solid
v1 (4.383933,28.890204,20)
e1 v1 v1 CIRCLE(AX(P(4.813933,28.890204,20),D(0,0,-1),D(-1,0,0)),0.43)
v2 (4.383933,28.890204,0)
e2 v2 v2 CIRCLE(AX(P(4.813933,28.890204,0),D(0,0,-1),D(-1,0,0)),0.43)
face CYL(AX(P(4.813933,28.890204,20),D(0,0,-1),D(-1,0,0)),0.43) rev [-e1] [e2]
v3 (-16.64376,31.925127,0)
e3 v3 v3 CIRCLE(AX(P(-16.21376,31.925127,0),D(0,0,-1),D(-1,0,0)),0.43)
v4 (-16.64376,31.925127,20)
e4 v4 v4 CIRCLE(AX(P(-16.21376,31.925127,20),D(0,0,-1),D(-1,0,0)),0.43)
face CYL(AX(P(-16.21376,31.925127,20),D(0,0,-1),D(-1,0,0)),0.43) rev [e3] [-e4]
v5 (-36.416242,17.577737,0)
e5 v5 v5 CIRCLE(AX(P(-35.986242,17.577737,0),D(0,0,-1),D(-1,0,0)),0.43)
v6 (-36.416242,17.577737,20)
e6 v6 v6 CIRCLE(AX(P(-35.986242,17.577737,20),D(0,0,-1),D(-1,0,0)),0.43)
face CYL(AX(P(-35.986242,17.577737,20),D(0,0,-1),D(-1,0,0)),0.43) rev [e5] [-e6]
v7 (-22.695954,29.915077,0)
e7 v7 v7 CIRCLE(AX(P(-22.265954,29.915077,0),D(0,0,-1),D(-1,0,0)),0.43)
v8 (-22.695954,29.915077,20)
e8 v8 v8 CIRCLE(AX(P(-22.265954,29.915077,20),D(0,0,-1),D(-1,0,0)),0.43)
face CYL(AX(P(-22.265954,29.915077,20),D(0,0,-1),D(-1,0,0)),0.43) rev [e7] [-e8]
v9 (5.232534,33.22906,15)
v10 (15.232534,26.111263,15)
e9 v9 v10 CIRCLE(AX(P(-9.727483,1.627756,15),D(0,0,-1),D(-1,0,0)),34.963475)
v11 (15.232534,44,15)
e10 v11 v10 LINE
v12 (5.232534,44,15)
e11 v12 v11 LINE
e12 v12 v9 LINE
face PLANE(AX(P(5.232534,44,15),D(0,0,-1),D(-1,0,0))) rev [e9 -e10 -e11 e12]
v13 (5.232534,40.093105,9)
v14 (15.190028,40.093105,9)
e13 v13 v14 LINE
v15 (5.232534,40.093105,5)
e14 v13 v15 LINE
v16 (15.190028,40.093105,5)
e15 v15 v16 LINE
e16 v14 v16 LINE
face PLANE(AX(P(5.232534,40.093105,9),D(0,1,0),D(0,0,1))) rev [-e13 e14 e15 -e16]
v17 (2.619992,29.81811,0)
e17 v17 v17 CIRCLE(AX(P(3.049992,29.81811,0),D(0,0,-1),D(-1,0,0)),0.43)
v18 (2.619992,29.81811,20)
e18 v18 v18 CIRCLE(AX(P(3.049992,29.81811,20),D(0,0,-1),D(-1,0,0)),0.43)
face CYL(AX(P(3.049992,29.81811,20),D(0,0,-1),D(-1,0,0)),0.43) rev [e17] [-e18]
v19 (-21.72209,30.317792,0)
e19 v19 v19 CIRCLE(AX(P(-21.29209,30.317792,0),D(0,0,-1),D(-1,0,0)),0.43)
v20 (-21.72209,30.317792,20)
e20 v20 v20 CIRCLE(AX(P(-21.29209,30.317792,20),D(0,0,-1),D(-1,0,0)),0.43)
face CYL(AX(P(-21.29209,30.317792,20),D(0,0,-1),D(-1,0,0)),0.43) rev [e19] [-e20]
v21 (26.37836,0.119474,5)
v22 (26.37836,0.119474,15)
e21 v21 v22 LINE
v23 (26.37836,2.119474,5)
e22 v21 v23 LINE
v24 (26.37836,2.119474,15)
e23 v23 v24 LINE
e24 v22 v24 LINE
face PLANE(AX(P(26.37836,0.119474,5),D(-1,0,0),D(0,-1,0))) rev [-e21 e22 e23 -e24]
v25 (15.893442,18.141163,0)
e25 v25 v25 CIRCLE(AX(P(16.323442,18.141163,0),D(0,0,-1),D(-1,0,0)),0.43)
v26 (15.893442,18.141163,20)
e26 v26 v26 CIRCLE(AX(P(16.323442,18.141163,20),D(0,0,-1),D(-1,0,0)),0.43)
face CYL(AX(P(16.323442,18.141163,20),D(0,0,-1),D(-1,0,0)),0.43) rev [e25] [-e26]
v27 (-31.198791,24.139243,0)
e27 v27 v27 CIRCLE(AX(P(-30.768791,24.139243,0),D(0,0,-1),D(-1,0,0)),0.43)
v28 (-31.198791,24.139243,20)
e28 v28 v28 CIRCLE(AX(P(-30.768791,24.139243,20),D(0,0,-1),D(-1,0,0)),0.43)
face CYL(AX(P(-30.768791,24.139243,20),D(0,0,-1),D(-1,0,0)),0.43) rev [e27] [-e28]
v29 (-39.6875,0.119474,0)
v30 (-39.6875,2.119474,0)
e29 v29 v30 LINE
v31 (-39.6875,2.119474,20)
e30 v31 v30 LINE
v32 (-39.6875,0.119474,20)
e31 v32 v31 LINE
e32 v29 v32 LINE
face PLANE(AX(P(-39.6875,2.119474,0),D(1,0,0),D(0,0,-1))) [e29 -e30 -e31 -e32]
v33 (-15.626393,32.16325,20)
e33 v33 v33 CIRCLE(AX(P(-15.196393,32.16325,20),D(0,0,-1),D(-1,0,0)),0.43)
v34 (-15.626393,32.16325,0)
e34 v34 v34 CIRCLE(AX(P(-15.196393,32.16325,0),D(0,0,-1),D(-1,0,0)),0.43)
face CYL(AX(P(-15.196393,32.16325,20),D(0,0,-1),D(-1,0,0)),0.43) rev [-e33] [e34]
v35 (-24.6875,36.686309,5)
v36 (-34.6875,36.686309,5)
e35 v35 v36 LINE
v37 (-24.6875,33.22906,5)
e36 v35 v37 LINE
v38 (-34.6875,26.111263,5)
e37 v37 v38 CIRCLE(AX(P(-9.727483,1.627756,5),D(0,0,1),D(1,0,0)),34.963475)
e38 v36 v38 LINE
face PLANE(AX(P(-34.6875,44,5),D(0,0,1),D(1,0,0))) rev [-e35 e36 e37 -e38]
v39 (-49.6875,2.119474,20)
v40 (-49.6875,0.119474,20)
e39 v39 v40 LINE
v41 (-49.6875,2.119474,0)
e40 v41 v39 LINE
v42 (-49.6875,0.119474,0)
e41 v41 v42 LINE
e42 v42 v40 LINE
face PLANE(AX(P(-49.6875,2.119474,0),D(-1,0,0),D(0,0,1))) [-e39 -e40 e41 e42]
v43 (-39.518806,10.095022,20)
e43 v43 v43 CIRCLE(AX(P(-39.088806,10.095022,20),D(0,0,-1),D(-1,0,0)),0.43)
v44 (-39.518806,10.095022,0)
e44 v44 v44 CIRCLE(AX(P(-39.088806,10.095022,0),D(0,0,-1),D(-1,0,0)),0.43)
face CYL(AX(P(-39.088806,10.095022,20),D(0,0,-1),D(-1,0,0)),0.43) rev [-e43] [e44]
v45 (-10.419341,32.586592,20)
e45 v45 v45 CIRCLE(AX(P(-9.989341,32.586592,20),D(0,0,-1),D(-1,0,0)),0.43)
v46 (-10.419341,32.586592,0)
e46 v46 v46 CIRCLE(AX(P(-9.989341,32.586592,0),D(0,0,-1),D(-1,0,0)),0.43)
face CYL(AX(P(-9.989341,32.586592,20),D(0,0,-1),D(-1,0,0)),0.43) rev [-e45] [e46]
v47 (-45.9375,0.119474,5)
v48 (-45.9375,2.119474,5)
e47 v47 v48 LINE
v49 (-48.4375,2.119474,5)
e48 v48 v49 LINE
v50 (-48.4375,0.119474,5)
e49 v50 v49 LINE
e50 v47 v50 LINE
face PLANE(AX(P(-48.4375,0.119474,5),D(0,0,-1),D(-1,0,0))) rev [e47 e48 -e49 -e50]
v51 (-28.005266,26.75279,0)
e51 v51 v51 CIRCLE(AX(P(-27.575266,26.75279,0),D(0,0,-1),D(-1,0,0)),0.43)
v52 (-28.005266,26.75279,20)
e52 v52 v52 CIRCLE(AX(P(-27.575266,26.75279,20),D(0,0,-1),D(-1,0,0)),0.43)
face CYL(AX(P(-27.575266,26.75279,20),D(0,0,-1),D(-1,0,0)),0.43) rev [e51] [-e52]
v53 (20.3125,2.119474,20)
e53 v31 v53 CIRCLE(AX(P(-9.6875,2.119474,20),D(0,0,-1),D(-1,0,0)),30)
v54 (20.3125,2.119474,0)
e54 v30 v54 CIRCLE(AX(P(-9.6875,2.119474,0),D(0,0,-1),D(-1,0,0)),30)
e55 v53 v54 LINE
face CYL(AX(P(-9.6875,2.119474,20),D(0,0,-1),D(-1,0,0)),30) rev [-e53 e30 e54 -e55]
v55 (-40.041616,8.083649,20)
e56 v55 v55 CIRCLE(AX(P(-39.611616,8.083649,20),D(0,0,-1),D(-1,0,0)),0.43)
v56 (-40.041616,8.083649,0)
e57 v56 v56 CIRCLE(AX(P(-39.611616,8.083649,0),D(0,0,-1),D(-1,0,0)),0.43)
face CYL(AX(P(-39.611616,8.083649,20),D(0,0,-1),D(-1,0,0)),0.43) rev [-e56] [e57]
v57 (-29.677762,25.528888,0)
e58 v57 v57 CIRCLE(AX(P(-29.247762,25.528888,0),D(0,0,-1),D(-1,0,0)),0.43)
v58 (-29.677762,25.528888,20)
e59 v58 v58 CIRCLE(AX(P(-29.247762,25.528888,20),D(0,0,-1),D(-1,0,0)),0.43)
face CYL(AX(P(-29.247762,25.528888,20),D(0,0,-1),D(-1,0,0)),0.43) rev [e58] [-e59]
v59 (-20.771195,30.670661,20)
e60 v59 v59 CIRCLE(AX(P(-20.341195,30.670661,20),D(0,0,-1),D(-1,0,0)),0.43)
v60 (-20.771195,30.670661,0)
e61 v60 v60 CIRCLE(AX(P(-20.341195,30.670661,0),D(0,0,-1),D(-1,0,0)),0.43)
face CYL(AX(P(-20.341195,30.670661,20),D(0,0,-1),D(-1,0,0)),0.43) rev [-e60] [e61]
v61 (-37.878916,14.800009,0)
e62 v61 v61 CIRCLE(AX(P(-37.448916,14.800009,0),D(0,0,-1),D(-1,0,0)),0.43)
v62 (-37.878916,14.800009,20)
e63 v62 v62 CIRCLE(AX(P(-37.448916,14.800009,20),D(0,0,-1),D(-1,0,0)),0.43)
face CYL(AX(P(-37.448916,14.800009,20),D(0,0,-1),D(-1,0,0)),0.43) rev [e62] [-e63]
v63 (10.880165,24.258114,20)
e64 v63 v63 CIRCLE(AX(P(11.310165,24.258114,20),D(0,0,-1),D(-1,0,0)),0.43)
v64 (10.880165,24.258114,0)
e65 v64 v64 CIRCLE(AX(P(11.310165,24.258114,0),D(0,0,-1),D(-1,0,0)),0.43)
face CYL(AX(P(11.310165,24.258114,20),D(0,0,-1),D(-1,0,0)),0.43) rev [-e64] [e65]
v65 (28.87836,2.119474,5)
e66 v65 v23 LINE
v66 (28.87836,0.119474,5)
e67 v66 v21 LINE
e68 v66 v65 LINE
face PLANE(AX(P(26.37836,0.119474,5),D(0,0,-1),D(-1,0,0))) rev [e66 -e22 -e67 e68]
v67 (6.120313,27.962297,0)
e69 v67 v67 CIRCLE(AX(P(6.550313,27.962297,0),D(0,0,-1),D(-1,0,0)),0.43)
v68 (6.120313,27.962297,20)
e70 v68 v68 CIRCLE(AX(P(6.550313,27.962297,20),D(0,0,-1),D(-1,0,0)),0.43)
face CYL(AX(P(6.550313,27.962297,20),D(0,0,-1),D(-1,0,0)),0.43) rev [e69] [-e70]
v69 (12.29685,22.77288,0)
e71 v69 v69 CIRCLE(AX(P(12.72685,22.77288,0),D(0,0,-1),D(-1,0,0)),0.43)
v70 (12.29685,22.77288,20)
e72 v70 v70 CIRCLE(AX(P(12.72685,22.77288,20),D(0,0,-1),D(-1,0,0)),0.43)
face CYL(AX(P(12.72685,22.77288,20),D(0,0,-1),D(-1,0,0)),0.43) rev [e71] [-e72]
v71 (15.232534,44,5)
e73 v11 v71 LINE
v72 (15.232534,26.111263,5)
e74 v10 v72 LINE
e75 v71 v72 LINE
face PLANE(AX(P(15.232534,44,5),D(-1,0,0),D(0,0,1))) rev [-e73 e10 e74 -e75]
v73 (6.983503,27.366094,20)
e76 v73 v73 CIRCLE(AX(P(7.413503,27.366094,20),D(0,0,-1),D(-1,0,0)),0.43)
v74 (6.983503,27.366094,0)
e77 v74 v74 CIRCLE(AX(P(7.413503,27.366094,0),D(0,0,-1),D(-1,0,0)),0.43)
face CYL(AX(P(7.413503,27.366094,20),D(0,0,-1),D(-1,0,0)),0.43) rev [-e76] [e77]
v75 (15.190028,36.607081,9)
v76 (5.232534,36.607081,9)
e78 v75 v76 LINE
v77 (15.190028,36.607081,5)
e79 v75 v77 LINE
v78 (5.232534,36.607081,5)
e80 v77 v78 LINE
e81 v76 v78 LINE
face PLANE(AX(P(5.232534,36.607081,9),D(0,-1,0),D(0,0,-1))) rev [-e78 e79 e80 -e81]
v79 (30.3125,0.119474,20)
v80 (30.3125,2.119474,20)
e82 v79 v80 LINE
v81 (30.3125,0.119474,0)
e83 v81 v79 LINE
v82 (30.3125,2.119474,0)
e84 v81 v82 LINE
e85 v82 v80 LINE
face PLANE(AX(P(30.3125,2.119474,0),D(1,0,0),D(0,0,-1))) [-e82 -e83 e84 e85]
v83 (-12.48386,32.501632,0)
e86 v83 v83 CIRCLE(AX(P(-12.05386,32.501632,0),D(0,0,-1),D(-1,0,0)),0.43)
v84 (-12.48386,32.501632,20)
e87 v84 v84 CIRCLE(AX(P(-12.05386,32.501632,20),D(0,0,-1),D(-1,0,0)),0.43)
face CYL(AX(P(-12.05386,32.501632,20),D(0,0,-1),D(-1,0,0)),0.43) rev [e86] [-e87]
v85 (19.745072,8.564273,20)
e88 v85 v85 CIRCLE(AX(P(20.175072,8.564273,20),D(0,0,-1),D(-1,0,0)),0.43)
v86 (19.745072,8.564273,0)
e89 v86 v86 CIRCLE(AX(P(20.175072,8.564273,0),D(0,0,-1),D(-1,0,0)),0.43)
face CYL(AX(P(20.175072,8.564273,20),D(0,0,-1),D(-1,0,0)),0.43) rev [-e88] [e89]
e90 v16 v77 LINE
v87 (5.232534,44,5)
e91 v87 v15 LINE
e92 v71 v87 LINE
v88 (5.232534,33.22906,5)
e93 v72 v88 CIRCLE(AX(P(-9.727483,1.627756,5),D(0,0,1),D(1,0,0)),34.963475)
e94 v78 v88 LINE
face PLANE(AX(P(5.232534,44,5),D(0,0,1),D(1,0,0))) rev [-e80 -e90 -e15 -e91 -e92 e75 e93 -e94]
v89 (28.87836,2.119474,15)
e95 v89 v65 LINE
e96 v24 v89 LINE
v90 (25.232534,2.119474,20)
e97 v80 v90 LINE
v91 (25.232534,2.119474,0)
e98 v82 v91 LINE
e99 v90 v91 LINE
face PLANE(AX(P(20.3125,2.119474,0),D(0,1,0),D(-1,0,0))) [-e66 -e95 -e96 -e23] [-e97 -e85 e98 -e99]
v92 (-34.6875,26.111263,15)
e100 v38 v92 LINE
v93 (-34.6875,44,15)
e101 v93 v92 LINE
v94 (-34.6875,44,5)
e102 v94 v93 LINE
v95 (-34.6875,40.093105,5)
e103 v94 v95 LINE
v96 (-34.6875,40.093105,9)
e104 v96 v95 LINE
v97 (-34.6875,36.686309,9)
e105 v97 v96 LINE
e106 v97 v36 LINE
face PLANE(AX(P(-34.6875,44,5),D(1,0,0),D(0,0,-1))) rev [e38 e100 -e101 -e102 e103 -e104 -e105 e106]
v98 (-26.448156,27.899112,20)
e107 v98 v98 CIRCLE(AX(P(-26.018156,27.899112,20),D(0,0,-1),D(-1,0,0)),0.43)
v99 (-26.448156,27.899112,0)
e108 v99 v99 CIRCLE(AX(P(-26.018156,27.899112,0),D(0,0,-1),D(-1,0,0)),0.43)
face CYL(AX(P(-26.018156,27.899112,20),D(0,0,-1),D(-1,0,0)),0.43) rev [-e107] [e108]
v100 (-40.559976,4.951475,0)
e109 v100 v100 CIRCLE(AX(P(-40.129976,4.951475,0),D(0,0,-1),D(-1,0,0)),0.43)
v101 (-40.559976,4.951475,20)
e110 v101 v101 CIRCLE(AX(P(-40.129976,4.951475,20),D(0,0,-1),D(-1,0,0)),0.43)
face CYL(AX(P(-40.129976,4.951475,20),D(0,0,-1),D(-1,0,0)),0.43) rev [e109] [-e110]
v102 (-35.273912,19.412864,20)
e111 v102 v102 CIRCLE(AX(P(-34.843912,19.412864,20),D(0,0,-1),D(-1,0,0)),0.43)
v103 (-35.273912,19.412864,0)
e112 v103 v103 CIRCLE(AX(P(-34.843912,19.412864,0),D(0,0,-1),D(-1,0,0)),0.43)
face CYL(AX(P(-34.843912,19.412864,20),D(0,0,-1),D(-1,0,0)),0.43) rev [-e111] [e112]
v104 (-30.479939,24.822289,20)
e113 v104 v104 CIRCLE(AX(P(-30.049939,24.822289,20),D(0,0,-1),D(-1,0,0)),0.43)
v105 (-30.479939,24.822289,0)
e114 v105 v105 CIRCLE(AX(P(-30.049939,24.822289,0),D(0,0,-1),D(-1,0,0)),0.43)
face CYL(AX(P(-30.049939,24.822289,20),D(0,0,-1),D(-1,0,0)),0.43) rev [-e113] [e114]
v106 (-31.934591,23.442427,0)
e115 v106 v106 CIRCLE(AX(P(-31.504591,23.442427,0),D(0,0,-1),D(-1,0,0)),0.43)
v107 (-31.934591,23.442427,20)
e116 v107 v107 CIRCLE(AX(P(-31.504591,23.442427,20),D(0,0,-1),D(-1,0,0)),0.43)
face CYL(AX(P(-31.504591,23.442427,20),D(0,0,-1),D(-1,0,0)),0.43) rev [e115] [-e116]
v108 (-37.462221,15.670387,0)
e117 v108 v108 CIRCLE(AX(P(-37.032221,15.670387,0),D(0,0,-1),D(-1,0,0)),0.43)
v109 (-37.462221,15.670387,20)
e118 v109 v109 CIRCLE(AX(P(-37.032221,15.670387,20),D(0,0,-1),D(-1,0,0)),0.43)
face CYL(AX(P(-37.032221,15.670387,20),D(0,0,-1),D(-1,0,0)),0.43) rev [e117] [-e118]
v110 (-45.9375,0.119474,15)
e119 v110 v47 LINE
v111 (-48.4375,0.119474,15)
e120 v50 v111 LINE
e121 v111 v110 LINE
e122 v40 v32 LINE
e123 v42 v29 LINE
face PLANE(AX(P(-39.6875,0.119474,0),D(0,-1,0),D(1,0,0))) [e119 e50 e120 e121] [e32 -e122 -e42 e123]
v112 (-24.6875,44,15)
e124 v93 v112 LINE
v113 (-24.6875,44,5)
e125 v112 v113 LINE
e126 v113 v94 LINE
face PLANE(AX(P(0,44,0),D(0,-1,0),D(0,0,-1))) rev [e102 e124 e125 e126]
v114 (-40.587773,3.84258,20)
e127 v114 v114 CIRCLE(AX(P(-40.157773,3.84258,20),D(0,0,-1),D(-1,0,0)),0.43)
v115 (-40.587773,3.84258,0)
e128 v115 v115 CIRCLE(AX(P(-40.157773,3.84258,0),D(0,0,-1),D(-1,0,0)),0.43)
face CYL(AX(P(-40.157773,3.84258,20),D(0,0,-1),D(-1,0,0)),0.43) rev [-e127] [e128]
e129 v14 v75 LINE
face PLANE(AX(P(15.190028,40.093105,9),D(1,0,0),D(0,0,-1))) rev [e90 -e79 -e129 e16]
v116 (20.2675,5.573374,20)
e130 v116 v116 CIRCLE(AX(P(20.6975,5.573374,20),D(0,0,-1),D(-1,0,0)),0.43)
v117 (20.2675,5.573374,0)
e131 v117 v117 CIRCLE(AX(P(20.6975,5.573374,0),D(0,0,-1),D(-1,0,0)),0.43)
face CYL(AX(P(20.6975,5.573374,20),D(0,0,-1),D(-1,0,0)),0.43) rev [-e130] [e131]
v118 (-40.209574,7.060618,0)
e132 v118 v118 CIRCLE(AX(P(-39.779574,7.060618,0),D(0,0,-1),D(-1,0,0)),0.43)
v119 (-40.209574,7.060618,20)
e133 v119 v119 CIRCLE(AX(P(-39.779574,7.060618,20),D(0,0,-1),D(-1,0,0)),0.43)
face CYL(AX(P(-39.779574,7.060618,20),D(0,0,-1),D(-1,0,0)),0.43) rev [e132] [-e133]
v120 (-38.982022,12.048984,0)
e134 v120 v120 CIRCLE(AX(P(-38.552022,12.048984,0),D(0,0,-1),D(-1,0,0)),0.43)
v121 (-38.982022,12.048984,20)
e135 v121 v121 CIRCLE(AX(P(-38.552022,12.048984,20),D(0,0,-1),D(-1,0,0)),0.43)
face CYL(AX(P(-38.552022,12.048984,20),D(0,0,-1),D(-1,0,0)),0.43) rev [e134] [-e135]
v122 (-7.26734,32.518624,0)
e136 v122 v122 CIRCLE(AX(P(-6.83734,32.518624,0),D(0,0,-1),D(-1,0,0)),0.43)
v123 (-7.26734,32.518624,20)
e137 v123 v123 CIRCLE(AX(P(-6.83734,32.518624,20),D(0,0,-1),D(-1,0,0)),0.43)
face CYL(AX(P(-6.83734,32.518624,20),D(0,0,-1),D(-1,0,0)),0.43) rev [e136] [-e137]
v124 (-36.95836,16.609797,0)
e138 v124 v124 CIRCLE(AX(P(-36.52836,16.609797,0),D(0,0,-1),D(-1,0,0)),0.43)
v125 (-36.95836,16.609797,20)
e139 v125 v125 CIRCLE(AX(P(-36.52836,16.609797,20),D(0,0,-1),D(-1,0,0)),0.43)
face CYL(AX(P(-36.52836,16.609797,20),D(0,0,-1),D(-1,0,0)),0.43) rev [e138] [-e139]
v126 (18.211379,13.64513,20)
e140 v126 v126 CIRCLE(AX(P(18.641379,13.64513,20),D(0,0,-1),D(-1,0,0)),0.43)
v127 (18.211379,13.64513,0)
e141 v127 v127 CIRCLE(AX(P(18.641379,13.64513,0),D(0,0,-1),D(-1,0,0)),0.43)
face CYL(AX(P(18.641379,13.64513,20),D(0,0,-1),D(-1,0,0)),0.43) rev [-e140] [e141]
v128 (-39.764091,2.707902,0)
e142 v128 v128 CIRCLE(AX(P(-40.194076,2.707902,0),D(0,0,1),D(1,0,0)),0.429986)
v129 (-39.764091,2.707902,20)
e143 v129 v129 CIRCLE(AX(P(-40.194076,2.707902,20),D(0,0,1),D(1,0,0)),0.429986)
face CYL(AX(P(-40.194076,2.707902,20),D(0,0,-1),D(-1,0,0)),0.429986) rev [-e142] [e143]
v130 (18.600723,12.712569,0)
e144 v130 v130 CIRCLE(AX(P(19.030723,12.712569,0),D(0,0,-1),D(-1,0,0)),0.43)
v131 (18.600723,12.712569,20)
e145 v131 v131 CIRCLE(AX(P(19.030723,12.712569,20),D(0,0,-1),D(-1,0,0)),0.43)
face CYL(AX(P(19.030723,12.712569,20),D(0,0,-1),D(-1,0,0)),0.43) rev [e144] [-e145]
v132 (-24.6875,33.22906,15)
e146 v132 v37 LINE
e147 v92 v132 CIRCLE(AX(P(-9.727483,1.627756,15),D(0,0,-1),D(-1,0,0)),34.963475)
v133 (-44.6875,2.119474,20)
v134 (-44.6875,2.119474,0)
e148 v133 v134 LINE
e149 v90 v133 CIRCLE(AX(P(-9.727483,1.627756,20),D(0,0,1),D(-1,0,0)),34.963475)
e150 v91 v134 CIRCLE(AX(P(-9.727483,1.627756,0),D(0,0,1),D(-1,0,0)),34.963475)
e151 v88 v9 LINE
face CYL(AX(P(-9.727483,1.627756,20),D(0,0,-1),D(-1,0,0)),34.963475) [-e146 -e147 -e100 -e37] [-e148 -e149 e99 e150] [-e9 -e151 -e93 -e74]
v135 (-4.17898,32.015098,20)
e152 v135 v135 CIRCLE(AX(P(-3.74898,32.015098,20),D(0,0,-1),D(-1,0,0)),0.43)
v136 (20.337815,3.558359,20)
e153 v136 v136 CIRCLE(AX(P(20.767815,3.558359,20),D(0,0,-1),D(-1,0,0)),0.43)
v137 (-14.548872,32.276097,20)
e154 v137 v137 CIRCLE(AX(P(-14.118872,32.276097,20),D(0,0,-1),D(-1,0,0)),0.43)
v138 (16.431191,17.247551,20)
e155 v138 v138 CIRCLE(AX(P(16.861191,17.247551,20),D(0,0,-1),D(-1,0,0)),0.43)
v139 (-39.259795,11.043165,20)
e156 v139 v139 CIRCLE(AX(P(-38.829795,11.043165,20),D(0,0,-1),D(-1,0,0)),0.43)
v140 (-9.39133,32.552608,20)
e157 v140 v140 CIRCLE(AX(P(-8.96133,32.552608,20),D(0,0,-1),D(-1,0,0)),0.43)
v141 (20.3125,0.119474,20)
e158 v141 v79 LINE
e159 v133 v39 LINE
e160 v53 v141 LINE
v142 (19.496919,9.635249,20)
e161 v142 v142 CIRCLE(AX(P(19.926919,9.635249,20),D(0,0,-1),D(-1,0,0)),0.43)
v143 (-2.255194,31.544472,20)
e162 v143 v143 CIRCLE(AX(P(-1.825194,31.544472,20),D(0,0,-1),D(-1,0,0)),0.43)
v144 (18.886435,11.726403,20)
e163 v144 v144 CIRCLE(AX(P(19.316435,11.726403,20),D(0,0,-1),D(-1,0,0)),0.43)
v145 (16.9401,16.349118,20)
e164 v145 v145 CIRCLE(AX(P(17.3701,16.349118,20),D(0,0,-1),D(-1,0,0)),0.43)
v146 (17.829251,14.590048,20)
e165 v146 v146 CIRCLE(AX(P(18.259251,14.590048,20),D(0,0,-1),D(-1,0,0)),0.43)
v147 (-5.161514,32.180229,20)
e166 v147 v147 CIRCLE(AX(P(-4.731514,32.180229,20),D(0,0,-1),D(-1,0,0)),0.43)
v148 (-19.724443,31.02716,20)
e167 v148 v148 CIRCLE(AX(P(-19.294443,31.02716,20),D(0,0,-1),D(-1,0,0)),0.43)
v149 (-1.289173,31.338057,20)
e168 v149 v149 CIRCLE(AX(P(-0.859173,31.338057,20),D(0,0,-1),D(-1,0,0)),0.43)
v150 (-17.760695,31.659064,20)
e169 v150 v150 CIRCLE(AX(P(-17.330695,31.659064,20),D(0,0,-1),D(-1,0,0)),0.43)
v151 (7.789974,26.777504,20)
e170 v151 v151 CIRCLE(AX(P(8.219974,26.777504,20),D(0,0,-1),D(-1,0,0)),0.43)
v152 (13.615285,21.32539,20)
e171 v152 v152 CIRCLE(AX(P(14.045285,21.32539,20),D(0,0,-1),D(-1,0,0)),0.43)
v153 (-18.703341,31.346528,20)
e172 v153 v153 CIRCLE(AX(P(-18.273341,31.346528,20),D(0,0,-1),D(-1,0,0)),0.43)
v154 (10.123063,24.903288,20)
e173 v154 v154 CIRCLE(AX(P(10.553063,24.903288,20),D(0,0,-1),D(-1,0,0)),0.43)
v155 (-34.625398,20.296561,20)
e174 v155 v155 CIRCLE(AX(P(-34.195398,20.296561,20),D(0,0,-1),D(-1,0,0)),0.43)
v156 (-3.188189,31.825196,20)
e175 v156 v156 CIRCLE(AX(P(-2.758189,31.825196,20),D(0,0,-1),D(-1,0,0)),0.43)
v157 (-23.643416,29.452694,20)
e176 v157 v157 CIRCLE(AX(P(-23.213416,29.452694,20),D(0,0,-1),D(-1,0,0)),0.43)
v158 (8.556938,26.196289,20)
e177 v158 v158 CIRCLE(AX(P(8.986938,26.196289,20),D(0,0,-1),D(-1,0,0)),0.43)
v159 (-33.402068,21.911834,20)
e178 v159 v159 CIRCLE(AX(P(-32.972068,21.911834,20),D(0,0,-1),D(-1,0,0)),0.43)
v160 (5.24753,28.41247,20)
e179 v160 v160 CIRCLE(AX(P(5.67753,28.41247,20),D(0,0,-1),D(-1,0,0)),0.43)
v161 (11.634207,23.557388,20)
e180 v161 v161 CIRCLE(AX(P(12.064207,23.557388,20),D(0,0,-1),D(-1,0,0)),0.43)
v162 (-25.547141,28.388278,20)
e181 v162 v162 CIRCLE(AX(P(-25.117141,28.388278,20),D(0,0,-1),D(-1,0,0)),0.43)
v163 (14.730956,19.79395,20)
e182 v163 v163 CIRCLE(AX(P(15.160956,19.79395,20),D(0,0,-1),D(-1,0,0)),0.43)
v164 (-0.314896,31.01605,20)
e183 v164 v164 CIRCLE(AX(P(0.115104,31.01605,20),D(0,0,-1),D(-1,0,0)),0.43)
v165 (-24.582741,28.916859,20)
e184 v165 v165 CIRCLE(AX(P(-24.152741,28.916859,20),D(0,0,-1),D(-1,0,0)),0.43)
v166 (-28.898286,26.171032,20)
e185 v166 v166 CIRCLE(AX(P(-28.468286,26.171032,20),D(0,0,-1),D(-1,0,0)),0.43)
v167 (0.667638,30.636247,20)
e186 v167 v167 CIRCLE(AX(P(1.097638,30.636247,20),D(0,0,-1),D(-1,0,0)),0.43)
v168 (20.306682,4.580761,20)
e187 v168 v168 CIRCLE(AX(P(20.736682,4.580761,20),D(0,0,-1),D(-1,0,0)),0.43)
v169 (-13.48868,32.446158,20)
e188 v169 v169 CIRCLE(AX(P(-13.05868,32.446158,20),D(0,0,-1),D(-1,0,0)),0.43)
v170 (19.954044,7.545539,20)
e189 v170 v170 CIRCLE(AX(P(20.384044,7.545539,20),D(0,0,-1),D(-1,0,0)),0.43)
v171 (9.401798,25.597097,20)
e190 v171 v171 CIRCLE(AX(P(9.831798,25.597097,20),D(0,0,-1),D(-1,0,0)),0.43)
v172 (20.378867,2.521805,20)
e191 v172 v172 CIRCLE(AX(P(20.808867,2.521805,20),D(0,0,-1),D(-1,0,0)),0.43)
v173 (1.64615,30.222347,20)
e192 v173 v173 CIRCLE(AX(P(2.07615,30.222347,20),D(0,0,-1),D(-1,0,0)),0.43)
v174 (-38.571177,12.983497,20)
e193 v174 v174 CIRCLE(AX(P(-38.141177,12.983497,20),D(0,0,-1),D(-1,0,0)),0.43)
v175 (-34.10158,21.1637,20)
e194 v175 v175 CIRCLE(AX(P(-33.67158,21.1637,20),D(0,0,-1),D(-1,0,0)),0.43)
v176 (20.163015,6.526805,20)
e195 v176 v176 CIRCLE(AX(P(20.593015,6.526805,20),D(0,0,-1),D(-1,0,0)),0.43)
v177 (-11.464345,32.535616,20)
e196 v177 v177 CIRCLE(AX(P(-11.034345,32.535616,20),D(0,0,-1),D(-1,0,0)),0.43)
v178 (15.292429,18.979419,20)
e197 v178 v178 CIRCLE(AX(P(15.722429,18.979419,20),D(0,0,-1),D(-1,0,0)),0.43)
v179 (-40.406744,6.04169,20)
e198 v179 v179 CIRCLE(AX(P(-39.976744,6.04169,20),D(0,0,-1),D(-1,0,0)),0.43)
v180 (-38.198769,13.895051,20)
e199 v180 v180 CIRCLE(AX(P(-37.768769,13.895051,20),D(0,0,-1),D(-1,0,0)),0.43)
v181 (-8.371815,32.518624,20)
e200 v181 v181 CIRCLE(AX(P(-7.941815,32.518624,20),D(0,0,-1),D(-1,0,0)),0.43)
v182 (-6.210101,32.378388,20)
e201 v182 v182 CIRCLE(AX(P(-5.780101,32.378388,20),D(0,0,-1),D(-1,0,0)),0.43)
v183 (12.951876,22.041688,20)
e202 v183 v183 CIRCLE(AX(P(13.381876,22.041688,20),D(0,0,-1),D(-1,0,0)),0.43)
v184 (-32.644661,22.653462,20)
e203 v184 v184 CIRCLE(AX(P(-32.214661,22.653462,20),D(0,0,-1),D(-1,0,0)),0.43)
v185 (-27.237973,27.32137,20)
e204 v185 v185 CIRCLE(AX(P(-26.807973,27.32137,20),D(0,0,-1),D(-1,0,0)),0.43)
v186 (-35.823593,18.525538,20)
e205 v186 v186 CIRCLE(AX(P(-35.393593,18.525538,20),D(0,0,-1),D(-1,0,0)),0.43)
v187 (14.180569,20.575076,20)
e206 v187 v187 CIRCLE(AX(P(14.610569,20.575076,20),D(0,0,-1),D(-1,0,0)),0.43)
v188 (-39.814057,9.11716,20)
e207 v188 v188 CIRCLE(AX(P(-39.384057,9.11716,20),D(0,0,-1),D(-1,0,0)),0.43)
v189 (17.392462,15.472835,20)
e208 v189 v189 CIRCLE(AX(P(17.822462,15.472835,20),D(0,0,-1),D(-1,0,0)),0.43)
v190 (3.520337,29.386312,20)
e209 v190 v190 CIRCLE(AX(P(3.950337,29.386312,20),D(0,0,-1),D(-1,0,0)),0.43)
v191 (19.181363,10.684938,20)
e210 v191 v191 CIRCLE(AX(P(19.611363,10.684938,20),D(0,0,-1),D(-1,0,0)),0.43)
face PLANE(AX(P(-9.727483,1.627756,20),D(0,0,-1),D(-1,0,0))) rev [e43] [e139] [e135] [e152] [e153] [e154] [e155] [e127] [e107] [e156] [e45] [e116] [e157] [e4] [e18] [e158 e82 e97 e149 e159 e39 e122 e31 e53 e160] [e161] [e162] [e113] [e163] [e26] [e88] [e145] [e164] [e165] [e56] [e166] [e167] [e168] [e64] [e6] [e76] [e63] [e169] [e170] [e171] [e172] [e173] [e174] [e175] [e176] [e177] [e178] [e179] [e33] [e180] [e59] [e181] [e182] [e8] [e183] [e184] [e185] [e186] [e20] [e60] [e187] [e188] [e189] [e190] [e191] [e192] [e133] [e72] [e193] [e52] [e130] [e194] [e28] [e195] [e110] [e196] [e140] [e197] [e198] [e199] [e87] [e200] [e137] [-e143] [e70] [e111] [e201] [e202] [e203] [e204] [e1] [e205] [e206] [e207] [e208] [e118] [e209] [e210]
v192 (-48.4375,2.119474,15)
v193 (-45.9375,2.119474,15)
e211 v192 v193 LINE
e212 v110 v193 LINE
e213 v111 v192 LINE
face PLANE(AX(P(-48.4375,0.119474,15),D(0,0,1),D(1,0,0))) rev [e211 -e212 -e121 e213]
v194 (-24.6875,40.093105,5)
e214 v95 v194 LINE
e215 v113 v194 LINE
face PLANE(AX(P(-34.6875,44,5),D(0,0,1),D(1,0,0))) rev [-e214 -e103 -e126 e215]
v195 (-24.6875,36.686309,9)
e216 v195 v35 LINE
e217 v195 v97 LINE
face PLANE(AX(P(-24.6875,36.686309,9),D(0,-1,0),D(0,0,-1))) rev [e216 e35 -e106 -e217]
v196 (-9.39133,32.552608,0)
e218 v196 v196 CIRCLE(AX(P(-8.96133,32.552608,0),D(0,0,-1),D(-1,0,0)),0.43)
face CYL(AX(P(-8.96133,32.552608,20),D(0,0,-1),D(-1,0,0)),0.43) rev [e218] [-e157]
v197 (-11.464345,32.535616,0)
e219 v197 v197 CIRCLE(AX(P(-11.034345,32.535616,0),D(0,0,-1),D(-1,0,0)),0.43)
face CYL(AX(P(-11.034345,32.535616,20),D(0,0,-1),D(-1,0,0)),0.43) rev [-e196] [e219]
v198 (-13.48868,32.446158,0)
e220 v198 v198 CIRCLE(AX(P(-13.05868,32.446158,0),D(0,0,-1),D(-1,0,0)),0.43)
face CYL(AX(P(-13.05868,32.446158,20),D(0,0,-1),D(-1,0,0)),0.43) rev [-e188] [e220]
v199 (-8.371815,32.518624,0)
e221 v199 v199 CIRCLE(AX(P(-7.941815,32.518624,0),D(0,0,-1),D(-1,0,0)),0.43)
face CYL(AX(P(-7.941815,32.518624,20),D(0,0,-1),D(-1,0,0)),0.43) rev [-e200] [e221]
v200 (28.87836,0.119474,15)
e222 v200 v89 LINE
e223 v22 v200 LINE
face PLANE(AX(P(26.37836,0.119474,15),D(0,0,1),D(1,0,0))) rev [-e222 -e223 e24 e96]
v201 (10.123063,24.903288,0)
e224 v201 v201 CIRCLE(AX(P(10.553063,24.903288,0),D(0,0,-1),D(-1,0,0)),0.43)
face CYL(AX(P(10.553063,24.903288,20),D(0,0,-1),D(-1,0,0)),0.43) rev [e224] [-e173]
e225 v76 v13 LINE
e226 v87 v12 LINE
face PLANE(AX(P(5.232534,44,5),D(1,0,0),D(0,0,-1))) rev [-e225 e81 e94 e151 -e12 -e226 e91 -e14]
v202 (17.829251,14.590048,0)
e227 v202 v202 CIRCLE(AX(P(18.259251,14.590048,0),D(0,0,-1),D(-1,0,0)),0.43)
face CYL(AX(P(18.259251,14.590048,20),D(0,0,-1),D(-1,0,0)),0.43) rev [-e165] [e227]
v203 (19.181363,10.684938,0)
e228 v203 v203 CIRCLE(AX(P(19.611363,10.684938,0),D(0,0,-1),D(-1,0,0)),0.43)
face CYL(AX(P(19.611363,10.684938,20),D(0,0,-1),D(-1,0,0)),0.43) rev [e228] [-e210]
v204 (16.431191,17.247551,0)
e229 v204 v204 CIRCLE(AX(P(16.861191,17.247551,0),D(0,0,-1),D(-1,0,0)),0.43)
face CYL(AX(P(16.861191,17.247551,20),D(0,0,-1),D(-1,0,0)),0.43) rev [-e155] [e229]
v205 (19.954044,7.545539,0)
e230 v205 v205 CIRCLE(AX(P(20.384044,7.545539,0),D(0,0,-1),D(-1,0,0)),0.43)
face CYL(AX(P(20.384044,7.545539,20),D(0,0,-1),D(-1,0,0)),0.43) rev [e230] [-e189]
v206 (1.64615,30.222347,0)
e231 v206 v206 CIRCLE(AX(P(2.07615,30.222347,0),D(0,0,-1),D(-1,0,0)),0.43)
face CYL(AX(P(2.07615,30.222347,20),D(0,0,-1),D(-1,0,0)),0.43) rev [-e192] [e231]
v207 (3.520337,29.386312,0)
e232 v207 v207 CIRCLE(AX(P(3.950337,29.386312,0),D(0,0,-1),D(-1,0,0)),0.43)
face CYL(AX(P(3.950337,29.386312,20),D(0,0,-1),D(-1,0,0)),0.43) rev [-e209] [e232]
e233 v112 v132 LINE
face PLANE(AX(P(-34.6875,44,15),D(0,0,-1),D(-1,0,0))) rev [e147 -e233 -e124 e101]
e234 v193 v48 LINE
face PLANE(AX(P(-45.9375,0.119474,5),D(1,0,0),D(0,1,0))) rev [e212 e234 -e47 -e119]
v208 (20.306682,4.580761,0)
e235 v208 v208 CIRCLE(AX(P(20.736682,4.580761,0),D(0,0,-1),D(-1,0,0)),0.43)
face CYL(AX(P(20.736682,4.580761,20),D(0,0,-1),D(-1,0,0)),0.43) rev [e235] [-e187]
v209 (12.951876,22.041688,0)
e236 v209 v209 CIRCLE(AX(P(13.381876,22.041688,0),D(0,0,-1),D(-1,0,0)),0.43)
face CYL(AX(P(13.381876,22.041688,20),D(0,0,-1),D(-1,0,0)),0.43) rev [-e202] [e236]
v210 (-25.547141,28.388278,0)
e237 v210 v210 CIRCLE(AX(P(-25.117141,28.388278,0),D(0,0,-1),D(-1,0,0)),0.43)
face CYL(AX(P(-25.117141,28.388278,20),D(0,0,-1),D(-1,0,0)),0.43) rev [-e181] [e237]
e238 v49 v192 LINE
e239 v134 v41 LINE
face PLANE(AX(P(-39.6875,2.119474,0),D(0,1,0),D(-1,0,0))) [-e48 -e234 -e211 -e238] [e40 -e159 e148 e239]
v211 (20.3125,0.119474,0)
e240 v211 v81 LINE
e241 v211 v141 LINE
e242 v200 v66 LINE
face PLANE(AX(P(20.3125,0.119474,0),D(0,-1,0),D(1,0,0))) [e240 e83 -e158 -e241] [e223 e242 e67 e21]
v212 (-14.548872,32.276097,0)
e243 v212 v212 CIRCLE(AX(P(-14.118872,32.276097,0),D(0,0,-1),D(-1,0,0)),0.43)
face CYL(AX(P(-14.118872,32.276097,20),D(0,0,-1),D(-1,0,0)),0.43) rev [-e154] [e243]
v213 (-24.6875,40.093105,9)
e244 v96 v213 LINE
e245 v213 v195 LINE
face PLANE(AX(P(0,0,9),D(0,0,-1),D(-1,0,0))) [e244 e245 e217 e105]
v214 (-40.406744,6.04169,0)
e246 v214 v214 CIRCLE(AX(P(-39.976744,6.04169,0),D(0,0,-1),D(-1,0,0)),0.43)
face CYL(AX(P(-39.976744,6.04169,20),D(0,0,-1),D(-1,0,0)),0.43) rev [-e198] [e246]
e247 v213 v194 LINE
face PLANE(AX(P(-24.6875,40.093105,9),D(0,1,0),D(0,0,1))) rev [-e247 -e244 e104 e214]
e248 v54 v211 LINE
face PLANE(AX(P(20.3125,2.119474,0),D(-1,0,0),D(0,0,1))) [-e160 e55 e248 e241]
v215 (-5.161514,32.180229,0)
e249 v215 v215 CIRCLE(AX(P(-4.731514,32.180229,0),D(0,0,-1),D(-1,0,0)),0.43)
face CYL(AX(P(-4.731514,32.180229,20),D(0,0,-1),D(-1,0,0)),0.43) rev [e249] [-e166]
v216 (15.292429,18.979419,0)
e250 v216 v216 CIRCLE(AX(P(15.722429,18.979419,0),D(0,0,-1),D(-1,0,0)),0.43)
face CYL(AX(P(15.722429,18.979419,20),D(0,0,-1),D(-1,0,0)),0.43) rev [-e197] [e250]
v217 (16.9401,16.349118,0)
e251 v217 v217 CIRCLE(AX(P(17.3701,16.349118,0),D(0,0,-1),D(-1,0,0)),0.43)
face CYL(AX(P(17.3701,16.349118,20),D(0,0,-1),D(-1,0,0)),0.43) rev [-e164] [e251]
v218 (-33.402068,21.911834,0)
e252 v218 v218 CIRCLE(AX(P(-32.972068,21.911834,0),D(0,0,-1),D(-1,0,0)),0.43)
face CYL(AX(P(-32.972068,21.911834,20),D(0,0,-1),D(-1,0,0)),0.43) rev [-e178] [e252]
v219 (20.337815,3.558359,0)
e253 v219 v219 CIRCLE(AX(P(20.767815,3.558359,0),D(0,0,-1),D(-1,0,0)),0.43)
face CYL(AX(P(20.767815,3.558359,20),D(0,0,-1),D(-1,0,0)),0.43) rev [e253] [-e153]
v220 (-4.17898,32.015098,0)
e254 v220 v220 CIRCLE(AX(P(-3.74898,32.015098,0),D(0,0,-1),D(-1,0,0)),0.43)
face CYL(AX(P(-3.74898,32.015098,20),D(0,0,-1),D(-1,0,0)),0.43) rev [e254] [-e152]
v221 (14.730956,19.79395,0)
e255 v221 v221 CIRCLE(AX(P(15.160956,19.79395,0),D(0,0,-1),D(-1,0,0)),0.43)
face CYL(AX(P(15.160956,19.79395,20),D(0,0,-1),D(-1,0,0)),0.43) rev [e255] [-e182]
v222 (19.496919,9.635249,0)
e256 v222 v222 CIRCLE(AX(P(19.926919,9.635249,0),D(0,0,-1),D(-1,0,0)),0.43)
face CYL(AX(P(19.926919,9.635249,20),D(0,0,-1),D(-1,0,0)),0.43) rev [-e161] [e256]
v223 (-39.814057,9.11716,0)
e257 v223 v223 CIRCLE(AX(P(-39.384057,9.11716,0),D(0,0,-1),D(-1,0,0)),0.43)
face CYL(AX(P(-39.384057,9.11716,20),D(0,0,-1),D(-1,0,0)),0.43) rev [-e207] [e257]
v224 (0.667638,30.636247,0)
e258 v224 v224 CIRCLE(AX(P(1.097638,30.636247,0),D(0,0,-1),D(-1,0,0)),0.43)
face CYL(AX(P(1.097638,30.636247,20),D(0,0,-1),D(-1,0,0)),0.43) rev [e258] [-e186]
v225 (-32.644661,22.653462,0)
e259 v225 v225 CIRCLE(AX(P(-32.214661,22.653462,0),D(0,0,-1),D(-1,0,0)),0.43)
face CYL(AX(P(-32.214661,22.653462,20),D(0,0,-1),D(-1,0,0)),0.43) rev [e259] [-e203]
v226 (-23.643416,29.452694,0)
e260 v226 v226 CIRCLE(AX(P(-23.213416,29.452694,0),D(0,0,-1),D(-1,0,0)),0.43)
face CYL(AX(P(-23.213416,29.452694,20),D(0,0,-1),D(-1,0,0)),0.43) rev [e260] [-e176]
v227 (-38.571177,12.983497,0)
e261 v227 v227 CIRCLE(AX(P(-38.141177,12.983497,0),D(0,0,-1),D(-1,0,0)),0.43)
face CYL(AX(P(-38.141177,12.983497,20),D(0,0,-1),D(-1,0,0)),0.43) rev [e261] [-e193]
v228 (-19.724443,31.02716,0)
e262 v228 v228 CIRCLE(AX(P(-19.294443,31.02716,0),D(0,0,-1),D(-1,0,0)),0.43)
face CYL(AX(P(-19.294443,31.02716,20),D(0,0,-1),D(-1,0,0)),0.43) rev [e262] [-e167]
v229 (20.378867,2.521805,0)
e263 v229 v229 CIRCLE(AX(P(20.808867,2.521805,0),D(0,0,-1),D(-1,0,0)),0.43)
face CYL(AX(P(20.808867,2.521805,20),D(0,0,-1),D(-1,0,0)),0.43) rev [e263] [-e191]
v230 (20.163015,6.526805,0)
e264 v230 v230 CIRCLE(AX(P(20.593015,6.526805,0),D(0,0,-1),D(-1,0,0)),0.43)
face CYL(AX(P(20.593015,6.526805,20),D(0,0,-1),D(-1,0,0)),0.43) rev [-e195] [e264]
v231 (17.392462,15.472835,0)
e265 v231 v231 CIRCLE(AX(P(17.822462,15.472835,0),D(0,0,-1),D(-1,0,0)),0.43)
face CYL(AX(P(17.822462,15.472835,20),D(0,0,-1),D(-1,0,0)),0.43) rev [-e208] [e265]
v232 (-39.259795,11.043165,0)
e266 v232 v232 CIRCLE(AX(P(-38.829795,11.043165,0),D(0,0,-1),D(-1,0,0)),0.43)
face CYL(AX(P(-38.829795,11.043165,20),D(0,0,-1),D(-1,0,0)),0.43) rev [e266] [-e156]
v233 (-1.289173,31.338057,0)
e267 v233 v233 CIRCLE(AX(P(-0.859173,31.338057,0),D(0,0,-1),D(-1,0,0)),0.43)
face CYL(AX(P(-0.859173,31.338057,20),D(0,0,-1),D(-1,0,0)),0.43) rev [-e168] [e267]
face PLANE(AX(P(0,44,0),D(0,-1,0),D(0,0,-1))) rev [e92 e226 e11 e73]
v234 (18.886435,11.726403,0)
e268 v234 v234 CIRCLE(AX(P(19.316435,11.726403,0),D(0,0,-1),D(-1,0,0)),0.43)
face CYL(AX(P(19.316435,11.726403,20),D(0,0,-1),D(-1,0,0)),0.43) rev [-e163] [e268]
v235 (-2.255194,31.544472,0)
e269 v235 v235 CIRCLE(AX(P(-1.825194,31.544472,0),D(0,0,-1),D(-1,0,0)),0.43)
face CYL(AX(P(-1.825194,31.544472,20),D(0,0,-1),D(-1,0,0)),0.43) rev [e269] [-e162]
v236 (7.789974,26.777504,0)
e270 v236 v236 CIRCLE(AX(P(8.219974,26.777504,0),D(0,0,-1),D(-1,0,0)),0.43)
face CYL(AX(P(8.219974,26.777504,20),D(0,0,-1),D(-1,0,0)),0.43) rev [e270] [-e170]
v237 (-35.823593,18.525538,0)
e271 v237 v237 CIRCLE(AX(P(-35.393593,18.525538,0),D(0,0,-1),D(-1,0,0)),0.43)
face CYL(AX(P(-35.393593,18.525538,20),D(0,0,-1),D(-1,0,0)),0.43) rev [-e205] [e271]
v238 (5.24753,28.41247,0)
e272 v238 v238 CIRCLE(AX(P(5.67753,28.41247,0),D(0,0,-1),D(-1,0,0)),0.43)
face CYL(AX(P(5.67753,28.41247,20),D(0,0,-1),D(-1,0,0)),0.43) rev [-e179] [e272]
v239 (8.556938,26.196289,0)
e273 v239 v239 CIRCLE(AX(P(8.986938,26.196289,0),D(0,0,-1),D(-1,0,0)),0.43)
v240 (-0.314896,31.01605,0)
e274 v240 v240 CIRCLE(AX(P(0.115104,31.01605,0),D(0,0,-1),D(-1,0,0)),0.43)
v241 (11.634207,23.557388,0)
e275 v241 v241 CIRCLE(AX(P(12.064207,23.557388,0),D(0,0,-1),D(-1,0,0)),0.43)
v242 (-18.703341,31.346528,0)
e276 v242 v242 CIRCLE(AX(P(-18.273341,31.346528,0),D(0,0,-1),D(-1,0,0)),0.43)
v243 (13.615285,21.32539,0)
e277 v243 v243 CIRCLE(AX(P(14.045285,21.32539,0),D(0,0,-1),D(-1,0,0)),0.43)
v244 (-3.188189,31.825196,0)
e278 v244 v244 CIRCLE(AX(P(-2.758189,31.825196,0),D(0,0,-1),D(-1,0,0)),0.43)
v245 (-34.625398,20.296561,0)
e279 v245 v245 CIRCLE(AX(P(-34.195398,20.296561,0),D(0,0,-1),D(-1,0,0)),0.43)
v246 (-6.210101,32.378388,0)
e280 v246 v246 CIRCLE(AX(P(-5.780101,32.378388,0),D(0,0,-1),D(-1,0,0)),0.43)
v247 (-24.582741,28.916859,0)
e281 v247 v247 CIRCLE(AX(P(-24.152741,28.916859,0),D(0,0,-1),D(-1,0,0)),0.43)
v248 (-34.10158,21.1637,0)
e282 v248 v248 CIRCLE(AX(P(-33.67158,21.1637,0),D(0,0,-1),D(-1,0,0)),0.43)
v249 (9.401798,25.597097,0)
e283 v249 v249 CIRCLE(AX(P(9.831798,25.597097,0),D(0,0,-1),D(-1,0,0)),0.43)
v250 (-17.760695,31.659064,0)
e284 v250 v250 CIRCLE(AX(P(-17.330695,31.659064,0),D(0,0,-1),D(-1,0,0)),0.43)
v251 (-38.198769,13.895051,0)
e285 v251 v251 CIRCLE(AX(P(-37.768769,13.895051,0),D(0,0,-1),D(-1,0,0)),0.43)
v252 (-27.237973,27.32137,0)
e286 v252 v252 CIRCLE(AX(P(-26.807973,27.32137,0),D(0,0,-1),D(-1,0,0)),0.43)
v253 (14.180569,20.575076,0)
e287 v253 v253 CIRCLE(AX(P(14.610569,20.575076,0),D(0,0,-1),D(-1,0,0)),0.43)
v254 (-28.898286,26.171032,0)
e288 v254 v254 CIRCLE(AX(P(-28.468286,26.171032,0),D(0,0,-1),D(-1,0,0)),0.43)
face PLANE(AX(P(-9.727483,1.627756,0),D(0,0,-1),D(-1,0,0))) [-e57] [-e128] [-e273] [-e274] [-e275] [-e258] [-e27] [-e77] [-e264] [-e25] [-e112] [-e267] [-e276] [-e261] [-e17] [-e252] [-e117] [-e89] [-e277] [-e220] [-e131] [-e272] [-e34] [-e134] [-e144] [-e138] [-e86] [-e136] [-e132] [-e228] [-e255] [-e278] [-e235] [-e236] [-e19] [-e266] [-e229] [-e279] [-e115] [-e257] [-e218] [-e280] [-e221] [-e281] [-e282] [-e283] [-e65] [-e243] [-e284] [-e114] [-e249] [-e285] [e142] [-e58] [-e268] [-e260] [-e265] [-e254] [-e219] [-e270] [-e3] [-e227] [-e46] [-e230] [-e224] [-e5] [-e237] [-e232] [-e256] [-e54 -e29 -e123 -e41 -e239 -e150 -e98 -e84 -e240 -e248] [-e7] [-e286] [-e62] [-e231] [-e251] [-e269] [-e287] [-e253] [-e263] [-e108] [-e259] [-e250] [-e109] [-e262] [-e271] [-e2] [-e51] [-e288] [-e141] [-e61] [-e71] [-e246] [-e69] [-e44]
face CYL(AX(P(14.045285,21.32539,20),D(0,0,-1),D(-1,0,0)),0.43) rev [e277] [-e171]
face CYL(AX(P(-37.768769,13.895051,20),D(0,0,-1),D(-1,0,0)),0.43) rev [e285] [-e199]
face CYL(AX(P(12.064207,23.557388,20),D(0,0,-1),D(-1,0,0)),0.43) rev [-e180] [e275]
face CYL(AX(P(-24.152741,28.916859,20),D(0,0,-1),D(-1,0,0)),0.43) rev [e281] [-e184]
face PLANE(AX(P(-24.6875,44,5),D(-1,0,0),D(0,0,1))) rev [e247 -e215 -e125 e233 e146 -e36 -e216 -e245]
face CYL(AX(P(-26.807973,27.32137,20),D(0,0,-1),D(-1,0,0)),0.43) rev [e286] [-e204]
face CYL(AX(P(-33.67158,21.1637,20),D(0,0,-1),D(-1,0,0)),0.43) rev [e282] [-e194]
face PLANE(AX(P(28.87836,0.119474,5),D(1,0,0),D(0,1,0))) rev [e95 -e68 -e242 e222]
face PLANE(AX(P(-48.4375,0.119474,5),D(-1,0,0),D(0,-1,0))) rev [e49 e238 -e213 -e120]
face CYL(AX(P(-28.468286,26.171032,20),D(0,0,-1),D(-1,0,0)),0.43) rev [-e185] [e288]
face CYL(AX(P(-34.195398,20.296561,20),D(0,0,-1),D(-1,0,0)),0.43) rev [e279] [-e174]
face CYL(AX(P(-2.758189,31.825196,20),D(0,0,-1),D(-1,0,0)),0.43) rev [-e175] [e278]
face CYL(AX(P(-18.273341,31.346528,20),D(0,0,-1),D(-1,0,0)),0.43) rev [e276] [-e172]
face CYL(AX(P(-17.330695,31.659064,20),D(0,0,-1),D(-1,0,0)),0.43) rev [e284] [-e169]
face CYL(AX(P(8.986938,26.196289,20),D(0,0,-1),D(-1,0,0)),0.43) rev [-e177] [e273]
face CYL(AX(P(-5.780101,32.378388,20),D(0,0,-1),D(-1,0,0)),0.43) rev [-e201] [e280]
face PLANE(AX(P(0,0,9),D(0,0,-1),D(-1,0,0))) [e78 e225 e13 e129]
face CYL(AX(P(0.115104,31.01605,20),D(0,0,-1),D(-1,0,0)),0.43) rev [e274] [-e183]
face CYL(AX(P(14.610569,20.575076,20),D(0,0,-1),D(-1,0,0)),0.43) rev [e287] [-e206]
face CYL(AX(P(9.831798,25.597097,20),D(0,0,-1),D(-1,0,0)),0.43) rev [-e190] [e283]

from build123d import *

# Parameters (mm, degrees)
BOSS_EXTRUDE1_DEPTH             = 20
SKETCH2_W                       = 10
SKETCH2_H                       = 2
BOSS_EXTRUDE2_DEPTH             = 20
SKETCH3_W                       = 2.5
SKETCH3_H                       = 10
CUT_EXTRUDE1_DEPTH              = 64.695758612
BOSS_EXTRUDE3_REACH             = 95.867
BOSS_EXTRUDE3_START             = 29
SKETCH5_W                       = 10
SKETCH5_H                       = 10
BOSS_EXTRUDE3_DIRECTION_2_DEPTH = 15
SKETCH15_W                      = 9.957494595
SKETCH15_H                      = 3.486023066
SKETCH15_W_2                    = 10
SKETCH15_H_2                    = 3.406795269
CUT_EXTRUDE2_DEPTH              = 4
SKETCH16_R                      = 0.429985908
CUT_EXTRUDE3_DEPTH              = 70.31700842
SKETCH19_R                      = 0.43
CUT_EXTRUDE4_DEPTH              = 70.31700842


with BuildPart() as part:
    # Sketch1 → Boss-Extrude1 (new body)
    with BuildSketch(Plane.XY):
        with BuildLine():
            Line((-44.6875, 2.119473798), (-39.6875, 2.119473798))
            ThreePointArc((-39.6875, 2.119473798), (-9.6875, 32.119473798), (20.3125, 2.119473798))
            Line((20.3125, 2.119473798), (25.232533649, 2.119473798))
            ThreePointArc((25.232533649, 2.119473798), (-9.727483176, 36.591230483), (-44.6875, 2.119473798))
        make_face()
    extrude(amount=BOSS_EXTRUDE1_DEPTH)

    # Sketch2 → Boss-Extrude2 (add)
    with BuildSketch(Plane.XY.offset(20)):
        with Locations((25.3125, 1.119473798)):
            Rectangle(SKETCH2_W, SKETCH2_H)
        with Locations((-44.6875, 1.119473798)):
            Rectangle(SKETCH2_W, SKETCH2_H)
    extrude(amount=-BOSS_EXTRUDE2_DEPTH)

    # Sketch3 → Cut-Extrude1 (cut, through all)
    with BuildSketch(Plane(origin=(0, 2.119473798, 0), x_dir=(1, 0, 0), z_dir=(0, 1, 0))):
        with Locations((-47.1875, -10)):
            Rectangle(SKETCH3_W, SKETCH3_H)
        with Locations((27.628360341, -10)):
            Rectangle(SKETCH3_W, SKETCH3_H)
    extrude(amount=-CUT_EXTRUDE1_DEPTH, mode=Mode.SUBTRACT)

    # Sketch5 → Boss-Extrude3 (add, up to next)
    with BuildSketch(Plane(origin=(0, 0, 0), x_dir=(1, 0, 0), z_dir=(0, 1, 0)).offset(BOSS_EXTRUDE3_START), mode=Mode.PRIVATE) as boss_extrude3_sk1:
        with Locations((-29.6875, -10)):
            Rectangle(SKETCH5_W, SKETCH5_H)
    boss_extrude3_tool1 = extrude(boss_extrude3_sk1.sketch, amount=-BOSS_EXTRUDE3_REACH, mode=Mode.PRIVATE) - part.part
    # Sketch5 → Boss-Extrude3 (add, up to next)
    with BuildSketch(Plane(origin=(0, 0, 0), x_dir=(1, 0, 0), z_dir=(0, 1, 0)).offset(BOSS_EXTRUDE3_START), mode=Mode.PRIVATE) as boss_extrude3_sk2:
        with Locations((10.232533649, -10)):
            Rectangle(SKETCH5_W, SKETCH5_H)
    boss_extrude3_tool2 = extrude(boss_extrude3_sk2.sketch, amount=-BOSS_EXTRUDE3_REACH, mode=Mode.PRIVATE) - part.part
    add(boss_extrude3_tool1.solids().sort_by_distance((-29.6875, 29, 10))[0])
    add(boss_extrude3_tool2.solids().sort_by_distance((10.232534, 29, 10))[0])

    # Sketch5 → Boss-Extrude3 direction 2 (add)
    with BuildSketch(Plane(origin=(0, 0, 0), x_dir=(1, 0, 0), z_dir=(0, 1, 0)).offset(BOSS_EXTRUDE3_START)):
        with Locations((-29.6875, -10)):
            Rectangle(SKETCH5_W, SKETCH5_H)
        with Locations((10.232533649, -10)):
            Rectangle(SKETCH5_W, SKETCH5_H)
    extrude(amount=BOSS_EXTRUDE3_DIRECTION_2_DEPTH)

    # Sketch15 → Cut-Extrude2 (cut)
    with BuildSketch(Plane(origin=(0, 0, 5), x_dir=(-1, 0, 0), z_dir=(0, 0, -1))):
        with Locations((-10.211280947, 38.350092999)):
            Rectangle(SKETCH15_W, SKETCH15_H)
        with Locations((29.6875, 38.389706898)):
            Rectangle(SKETCH15_W_2, SKETCH15_H_2)
    extrude(amount=-CUT_EXTRUDE2_DEPTH, mode=Mode.SUBTRACT)

    # Sketch16 → Cut-Extrude3 (cut, through all)
    with BuildSketch(Plane.XY):
        with Locations((-40.194076416, 2.70790241)):
            Circle(SKETCH16_R)
    extrude(amount=CUT_EXTRUDE3_DEPTH, mode=Mode.SUBTRACT)

    # Sketch19 → Cut-Extrude4 (cut, through all)
    with BuildSketch(Plane(origin=(0, 0, 0), x_dir=(-1, 0, 0), z_dir=(0, 0, -1))):
        with Locations((40.157773316, 3.842579994)):
            Circle(SKETCH19_R)
        with Locations((40.129976485, 4.951475276)):
            Circle(SKETCH19_R)
        with Locations((39.976743657, 6.041690441)):
            Circle(SKETCH19_R)
        with Locations((39.77957363, 7.060618267)):
            Circle(SKETCH19_R)
        with Locations((39.611616001, 8.083648579)):
            Circle(SKETCH19_R)
        with Locations((39.384056604, 9.117159584)):
            Circle(SKETCH19_R)
        with Locations((38.829794547, 11.043164756)):
            Circle(SKETCH19_R)
        with Locations((38.552022228, 12.048984433)):
            Circle(SKETCH19_R)
        with Locations((39.088806217, 10.095021994)):
            Circle(SKETCH19_R)
        with Locations((38.141177141, 12.983497136)):
            Circle(SKETCH19_R)
        with Locations((37.768769018, 13.895051344)):
            Circle(SKETCH19_R)
        with Locations((37.448916338, 14.800008888)):
            Circle(SKETCH19_R)
        with Locations((37.032221222, 15.670387014)):
            Circle(SKETCH19_R)
        with Locations((36.528360395, 16.609796608)):
            Circle(SKETCH19_R)
        with Locations((35.986242339, 17.577737268)):
            Circle(SKETCH19_R)
        with Locations((35.393593155, 18.525538356)):
            Circle(SKETCH19_R)
        with Locations((34.843911912, 19.412863745)):
            Circle(SKETCH19_R)
        with Locations((34.19539752, 20.296560878)):
            Circle(SKETCH19_R)
        with Locations((33.671579827, 21.16369959)):
            Circle(SKETCH19_R)
        with Locations((30.049939441, 24.82228941)):
            Circle(SKETCH19_R)
        with Locations((29.247761657, 25.528887704)):
            Circle(SKETCH19_R)
        with Locations((28.468285707, 26.171032429)):
            Circle(SKETCH19_R)
        with Locations((27.575265581, 26.752789683)):
            Circle(SKETCH19_R)
        with Locations((26.807973066, 27.321370243)):
            Circle(SKETCH19_R)
        with Locations((26.018155923, 27.899111723)):
            Circle(SKETCH19_R)
        with Locations((25.117140803, 28.388278306)):
            Circle(SKETCH19_R)
        with Locations((24.152740884, 28.916859444)):
            Circle(SKETCH19_R)
        with Locations((23.213415748, 29.452693957)):
            Circle(SKETCH19_R)
        with Locations((22.265953613, 29.915077196)):
            Circle(SKETCH19_R)
        with Locations((21.292090137, 30.317791635)):
            Circle(SKETCH19_R)
        with Locations((20.341195492, 30.670660652)):
            Circle(SKETCH19_R)
        with Locations((19.294443445, 31.027159999)):
            Circle(SKETCH19_R)
        with Locations((18.273341346, 31.346527811)):
            Circle(SKETCH19_R)
        with Locations((17.330694676, 31.659064493)):
            Circle(SKETCH19_R)
        with Locations((16.213760043, 31.925126509)):
            Circle(SKETCH19_R)
        with Locations((15.196392743, 32.163250345)):
            Circle(SKETCH19_R)
        with Locations((14.118871826, 32.276097443)):
            Circle(SKETCH19_R)
        with Locations((9.989341485, 32.586591657)):
            Circle(SKETCH19_R)
        with Locations((32.972067882, 21.91183374)):
            Circle(SKETCH19_R)
        with Locations((32.214660672, 22.653461633)):
            Circle(SKETCH19_R)
        with Locations((31.504591412, 23.442427477)):
            Circle(SKETCH19_R)
        with Locations((30.768790829, 24.13924253)):
            Circle(SKETCH19_R)
        with Locations((13.058680454, 32.446158075)):
            Circle(SKETCH19_R)
        with Locations((12.053860203, 32.501632039)):
            Circle(SKETCH19_R)
        with Locations((11.034344787, 32.535615887)):
            Circle(SKETCH19_R)
        with Locations((8.961330107, 32.55260781)):
            Circle(SKETCH19_R)
        with Locations((7.941814691, 32.518623963)):
            Circle(SKETCH19_R)
        with Locations((6.837339657, 32.518623963)):
            Circle(SKETCH19_R)
        with Locations((5.780100612, 32.378387633)):
            Circle(SKETCH19_R)
        with Locations((4.731513778, 32.180229491)):
            Circle(SKETCH19_R)
        with Locations((3.748979658, 32.015097706)):
            Circle(SKETCH19_R)
        with Locations((2.758188948, 31.825196153)):
            Circle(SKETCH19_R)
        with Locations((1.825194364, 31.544472119)):
            Circle(SKETCH19_R)
        with Locations((0.859173422, 31.338057388)):
            Circle(SKETCH19_R)
        with Locations((-0.115104109, 31.016050407)):
            Circle(SKETCH19_R)
        with Locations((-1.097638229, 30.636247302)):
            Circle(SKETCH19_R)
        with Locations((-2.076149977, 30.222346847)):
            Circle(SKETCH19_R)
        with Locations((-3.049992433, 29.818110356)):
            Circle(SKETCH19_R)
        with Locations((-3.950337346, 29.386312285)):
            Circle(SKETCH19_R)
        with Locations((-4.813933487, 28.890203864)):
            Circle(SKETCH19_R)
        with Locations((-5.677529628, 28.412469829)):
            Circle(SKETCH19_R)
        with Locations((-6.550312962, 27.962297372)):
            Circle(SKETCH19_R)
        with Locations((-7.413502609, 27.366093596)):
            Circle(SKETCH19_R)
        with Locations((-8.219973711, 26.777503937)):
            Circle(SKETCH19_R)
        with Locations((-8.986938394, 26.196288512)):
            Circle(SKETCH19_R)
        with Locations((-9.831797929, 25.597097353)):
            Circle(SKETCH19_R)
        with Locations((-10.553062854, 24.903287734)):
            Circle(SKETCH19_R)
        with Locations((-11.310165464, 24.258114165)):
            Circle(SKETCH19_R)
        with Locations((-12.06420723, 23.557388483)):
            Circle(SKETCH19_R)
        with Locations((-12.726849995, 22.772880383)):
            Circle(SKETCH19_R)
        with Locations((-13.381876175, 22.041688367)):
            Circle(SKETCH19_R)
        with Locations((-14.045284633, 21.325390255)):
            Circle(SKETCH19_R)
        with Locations((-14.610568668, 20.575076455)):
            Circle(SKETCH19_R)
        with Locations((-15.160955996, 19.793949768)):
            Circle(SKETCH19_R)
        with Locations((-15.722428913, 18.979418635)):
            Circle(SKETCH19_R)
        with Locations((-16.323442177, 18.141163294)):
            Circle(SKETCH19_R)
        with Locations((-16.861190886, 17.247551468)):
            Circle(SKETCH19_R)
        with Locations((-17.370099884, 16.349117506)):
            Circle(SKETCH19_R)
        with Locations((-17.822461681, 15.472834796)):
            Circle(SKETCH19_R)
        with Locations((-18.259251056, 14.590047971)):
            Circle(SKETCH19_R)
        with Locations((-18.641379366, 13.645130385)):
            Circle(SKETCH19_R)
        with Locations((-19.030723208, 12.71256922)):
            Circle(SKETCH19_R)
        with Locations((-19.316434923, 11.726402977)):
            Circle(SKETCH19_R)
        with Locations((-19.611363146, 10.684937692)):
            Circle(SKETCH19_R)
        with Locations((-19.926919345, 9.635249333)):
            Circle(SKETCH19_R)
        with Locations((-20.1750725, 8.564272558)):
            Circle(SKETCH19_R)
        with Locations((-20.384043578, 7.545538552)):
            Circle(SKETCH19_R)
        with Locations((-20.593014656, 6.526804546)):
            Circle(SKETCH19_R)
        with Locations((-20.697500195, 5.573374003)):
            Circle(SKETCH19_R)
        with Locations((-20.736682272, 4.580761382)):
            Circle(SKETCH19_R)
        with Locations((-20.767815184, 3.558359305)):
            Circle(SKETCH19_R)
        with Locations((-20.808866838, 2.521805048)):
            Circle(SKETCH19_R)
    extrude(amount=-CUT_EXTRUDE4_DEPTH, mode=Mode.SUBTRACT)


solid = part.part
